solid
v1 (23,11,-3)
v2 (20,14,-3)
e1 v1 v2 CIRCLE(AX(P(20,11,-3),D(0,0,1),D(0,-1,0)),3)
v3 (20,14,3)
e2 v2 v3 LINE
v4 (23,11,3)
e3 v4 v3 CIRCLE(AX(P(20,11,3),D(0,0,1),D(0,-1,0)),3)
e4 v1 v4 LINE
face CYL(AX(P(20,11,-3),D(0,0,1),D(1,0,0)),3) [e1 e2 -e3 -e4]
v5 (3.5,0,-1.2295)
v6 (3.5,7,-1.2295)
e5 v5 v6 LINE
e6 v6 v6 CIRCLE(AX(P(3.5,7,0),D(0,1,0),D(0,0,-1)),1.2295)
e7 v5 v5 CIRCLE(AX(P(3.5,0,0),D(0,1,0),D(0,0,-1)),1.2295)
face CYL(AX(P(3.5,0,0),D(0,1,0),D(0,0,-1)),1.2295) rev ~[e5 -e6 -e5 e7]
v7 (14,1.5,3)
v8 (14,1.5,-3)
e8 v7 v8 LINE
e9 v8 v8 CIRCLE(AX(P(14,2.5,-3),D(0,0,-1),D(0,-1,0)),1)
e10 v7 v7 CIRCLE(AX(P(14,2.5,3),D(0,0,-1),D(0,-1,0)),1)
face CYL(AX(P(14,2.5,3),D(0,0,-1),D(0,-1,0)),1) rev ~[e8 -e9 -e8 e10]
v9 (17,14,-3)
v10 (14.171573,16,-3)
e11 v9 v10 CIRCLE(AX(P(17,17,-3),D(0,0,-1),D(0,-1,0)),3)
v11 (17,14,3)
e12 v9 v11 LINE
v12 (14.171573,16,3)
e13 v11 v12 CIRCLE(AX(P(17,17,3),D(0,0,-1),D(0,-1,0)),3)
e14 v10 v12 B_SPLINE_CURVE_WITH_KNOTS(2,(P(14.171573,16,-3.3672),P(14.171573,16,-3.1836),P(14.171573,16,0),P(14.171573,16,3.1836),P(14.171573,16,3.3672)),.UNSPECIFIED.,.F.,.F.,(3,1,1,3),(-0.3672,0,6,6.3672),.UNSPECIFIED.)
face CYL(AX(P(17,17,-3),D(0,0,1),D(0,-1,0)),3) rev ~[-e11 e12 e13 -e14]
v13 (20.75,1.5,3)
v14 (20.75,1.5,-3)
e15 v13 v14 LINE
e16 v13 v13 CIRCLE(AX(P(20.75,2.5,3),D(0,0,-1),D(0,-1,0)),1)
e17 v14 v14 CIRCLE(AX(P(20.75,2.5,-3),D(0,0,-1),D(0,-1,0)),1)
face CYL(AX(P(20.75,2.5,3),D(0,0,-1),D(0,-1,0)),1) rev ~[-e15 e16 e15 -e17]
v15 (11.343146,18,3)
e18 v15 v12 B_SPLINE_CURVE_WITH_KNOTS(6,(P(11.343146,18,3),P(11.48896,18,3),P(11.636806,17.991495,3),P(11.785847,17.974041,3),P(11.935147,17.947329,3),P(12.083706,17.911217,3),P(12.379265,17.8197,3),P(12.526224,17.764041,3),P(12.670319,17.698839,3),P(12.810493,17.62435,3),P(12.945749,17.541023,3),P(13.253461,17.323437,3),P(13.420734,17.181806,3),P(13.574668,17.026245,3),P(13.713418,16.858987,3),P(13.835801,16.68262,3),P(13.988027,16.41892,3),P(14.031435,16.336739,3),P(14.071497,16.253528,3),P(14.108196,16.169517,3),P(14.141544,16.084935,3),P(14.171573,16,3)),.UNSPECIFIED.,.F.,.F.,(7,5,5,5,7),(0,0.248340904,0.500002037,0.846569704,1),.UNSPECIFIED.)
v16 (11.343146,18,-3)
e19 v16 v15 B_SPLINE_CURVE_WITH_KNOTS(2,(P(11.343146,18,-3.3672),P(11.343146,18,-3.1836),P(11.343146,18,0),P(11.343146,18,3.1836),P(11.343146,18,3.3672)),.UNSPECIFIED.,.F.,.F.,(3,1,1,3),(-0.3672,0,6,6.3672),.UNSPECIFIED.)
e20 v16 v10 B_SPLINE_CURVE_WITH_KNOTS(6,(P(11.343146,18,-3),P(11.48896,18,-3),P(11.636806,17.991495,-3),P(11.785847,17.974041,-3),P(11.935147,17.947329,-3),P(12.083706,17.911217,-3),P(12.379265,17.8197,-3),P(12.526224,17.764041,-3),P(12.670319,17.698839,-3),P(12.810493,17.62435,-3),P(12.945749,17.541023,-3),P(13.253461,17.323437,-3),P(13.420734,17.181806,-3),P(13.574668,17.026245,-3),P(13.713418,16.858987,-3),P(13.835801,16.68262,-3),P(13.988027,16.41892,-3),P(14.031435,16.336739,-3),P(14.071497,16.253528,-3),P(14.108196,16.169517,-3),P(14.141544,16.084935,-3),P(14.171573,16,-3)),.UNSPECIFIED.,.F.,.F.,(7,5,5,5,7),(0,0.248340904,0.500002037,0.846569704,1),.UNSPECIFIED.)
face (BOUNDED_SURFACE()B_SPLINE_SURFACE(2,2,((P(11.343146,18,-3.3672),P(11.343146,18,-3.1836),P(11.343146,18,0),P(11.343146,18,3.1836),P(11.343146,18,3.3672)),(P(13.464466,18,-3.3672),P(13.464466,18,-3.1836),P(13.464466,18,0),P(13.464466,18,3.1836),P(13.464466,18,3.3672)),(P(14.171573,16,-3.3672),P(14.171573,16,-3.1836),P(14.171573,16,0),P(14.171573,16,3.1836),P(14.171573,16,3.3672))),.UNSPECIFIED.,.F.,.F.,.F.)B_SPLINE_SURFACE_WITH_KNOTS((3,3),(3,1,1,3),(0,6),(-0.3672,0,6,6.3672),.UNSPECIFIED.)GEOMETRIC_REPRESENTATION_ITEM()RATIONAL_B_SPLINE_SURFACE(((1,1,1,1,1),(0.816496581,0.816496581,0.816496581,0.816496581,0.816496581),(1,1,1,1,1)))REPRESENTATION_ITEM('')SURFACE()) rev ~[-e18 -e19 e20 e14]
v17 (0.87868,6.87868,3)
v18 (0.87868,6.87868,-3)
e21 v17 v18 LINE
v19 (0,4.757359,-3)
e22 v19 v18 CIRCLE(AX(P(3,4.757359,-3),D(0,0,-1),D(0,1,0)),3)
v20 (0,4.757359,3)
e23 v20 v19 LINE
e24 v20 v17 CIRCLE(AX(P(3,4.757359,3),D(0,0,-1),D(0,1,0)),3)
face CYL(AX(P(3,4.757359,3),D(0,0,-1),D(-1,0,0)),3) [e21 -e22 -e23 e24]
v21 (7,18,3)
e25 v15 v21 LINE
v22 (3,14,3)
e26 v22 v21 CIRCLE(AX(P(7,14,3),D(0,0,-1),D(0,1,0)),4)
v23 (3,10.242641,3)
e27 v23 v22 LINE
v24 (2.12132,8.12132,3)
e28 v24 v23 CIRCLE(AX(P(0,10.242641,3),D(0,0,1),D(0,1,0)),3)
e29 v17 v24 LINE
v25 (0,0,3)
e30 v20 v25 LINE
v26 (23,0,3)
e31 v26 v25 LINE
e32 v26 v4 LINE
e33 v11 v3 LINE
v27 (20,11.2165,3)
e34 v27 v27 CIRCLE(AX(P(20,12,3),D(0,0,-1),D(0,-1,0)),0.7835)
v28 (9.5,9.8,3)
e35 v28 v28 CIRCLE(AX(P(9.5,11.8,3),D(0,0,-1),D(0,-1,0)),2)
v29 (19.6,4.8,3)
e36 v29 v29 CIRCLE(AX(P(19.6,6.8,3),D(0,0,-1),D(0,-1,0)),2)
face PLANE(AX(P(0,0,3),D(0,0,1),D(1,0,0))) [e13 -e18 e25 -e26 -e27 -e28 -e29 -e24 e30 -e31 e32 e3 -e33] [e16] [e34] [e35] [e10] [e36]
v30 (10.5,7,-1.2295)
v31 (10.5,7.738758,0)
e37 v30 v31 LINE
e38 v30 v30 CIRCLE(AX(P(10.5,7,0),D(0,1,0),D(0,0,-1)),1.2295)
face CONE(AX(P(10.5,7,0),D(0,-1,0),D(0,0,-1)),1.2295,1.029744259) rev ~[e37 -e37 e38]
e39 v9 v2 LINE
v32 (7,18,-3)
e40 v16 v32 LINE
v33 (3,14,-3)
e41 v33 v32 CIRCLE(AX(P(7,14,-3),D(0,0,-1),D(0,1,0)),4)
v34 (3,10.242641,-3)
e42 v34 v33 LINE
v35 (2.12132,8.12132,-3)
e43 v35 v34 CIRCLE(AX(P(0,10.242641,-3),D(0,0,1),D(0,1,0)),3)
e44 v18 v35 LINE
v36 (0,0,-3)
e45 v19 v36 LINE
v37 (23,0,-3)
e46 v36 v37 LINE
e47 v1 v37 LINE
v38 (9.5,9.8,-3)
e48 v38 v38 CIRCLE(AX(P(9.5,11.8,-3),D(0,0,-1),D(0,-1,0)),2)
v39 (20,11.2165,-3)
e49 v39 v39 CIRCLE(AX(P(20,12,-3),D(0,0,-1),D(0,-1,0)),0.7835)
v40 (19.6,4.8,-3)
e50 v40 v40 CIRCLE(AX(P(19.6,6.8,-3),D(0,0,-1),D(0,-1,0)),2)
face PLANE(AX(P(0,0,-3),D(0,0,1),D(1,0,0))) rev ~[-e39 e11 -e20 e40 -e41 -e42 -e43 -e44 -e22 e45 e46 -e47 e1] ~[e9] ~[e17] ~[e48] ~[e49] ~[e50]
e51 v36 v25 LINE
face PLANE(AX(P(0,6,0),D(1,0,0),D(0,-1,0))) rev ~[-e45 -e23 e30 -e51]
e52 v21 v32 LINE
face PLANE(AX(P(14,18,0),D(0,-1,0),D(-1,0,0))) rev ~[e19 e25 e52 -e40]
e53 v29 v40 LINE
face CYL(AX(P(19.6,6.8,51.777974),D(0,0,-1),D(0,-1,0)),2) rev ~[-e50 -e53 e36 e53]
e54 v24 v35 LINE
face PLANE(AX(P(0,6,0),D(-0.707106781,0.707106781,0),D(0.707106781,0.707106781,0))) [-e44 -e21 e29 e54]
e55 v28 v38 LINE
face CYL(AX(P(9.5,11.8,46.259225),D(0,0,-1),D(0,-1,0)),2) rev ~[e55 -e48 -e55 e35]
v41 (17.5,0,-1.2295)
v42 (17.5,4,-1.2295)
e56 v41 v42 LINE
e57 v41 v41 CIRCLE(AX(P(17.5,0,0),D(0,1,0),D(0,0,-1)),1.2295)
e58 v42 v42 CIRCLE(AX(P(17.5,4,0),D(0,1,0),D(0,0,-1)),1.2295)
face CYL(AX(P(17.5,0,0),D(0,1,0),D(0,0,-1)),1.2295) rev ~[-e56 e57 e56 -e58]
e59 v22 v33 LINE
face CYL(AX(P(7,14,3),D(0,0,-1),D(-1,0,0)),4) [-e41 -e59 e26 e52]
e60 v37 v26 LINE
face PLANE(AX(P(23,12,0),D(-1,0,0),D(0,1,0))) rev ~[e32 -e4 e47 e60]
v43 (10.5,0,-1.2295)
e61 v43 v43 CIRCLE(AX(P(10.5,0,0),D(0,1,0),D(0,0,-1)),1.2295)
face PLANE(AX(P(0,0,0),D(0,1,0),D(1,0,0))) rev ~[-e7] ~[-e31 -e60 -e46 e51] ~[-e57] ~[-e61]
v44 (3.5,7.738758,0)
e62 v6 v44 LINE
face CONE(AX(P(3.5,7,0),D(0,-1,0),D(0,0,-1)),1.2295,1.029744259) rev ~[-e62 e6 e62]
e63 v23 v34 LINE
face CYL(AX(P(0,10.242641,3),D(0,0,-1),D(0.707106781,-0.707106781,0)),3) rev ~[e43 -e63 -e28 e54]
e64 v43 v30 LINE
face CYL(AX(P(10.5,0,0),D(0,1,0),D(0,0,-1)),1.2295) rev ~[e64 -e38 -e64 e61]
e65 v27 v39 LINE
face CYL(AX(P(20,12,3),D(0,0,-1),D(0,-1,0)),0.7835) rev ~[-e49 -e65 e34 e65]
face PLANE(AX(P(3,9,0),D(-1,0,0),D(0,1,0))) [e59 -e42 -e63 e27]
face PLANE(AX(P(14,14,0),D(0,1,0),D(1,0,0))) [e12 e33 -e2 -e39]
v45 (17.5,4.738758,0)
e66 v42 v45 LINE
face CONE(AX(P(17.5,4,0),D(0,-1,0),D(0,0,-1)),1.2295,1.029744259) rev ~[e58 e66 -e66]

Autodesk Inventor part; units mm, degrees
ref_plane "YZ Plane" through (0, 0, 0) normal (1, 0, 0) x (0, 1, 0)
ref_plane "XZ Plane" through (0, 0, 0) normal (0, 1, 0) x (-1, 0, 0)
ref_plane "XY Plane" through (0, 0, 0) normal (0, 0, 1) x (1, 0, 0)
sketch "Skizze2" plane through (0, 0, 0) normal (0, 0, 1) x (1, 0, 0)
  line L0 (0, 0) -> (23, 0)
  line L1 (23, 0) -> (23, 18)
  line L2 (23, 18) -> (3, 18)
  line L3 (0, 6) -> (0, 0)
  line L4 (0, 0) -> (0, 6)
  line L5 (0, 6) -> (3, 6)
  line L6 (3, 6) -> (3, 18)
  line L7 (0, 6) -> (3, 9)
  line L8 (0, 0) -> (19.6, 0)
  line L9 (19.6, 0) -> (19.6, 6.8)
  line L10 (23, 0) -> (23, 12)
  line L11 (9.5, 0) -> (9.5, 11.8)
  line L12 (14, 14) -> (23, 14)
  line L13 (14, 14) -> (14, 18)
  dimension "d21" = 18
  dimension "d22" = 6
  dimension "d23" = 3
  dimension "d24" = 23
  dimension "d25" = 45
  dimension "d26" = 19.6
  dimension "d27" = 6.8
  dimension "d28" = 12
  dimension "d30" = 11.8
  dimension "d31" = 9.5
  dimension "d36" = 14
  dimension "d37" = 9
extrude "Extrusion1" add sketch "Skizze2" along normal mid plane 6 contours L3 L5 L6 L2 L13 L12 L1 L0 | L7 L6 L5
hole "Bohrung1" at (19.6, 6.8, 0) at (9.5, 11.8, 0) direction (0, 0, -1) diameter 4 end through all both
fillet "Rundung1" radius 3 4 edges at (0, 6, 0) (3, 9, 0) (23, 14, 0) (14, 14, 0)
fillet "Rundung2" radius 4 1 edges at (3, 18, 0)
fillet "Rundung3" radius 3 1 edges at (14, 18, 0)
sketch "Skizze3" plane through (0, 0, 3) normal (0, -1, 0) x (1, 0, 0)
  line L0 (0, -3) -> (3.5, -3) construction
  line L1 (3.5, -3) -> (10.5, -3) construction
  line L2 (10.5, -3) -> (17.5, -3) construction
  dimension "d50" = 3.5
  dimension "d51" = 7
  dimension "d52" = 7
hole "Bohrung2" at (3.5, 0, 0) at (10.5, 0, 0) direction (0, 1, 0) diameter 2.459 depth 7 tip angle 118 thread size "M3x0.5" class "6H" standard "ISO Metric profile"
hole "Bohrung3" at (17.5, 0, 0) direction (0, 1, 0) diameter 2.459 depth 4 tip angle 118 thread size "M3x0.5" class "6H" standard "ISO Metric profile"
sketch "Skizze4" plane through (0, 0, 3) normal (0, 0, 1) x (1, 0, 0)
  line L0 (14, 0) -> (14, 2.5)
  line L1 (20.75, 0) -> (20.75, 2.5)
  line L2 (0, 4.7574) -> (0, 0) projected
  line L3 (0, 0) -> (0, 4.7574)
  point P0 (23, 0)
  dimension "d71" = 2.5
  dimension "d72" = 2.5
  dimension "d89" = 14
  dimension "d90" = 6.75
hole "Bohrung4" at (14, 2.5, 3) at (20.75, 2.5, 3) direction (0, 0, -1) diameter 2 end through all
sketch "Skizze5" plane through (0, 0, 3) normal (0, 0, 1) x (1, 0, 0)
  line L0 (20, 0) -> (20, 12)
  line L1 (0, 4.7574) -> (0, 0) projected
  line L2 (0, 0) -> (0, 4.7574)
  dimension "d81" = 12
  dimension "d91" = 20
hole "Bohrung5" at (20, 12, 3) direction (0, 0, -1) diameter 1.567 depth 6 thread size "M2x0.4" class "6H" standard "ISO Metric profile"
properties part number "Lagerblock Dribbler"
